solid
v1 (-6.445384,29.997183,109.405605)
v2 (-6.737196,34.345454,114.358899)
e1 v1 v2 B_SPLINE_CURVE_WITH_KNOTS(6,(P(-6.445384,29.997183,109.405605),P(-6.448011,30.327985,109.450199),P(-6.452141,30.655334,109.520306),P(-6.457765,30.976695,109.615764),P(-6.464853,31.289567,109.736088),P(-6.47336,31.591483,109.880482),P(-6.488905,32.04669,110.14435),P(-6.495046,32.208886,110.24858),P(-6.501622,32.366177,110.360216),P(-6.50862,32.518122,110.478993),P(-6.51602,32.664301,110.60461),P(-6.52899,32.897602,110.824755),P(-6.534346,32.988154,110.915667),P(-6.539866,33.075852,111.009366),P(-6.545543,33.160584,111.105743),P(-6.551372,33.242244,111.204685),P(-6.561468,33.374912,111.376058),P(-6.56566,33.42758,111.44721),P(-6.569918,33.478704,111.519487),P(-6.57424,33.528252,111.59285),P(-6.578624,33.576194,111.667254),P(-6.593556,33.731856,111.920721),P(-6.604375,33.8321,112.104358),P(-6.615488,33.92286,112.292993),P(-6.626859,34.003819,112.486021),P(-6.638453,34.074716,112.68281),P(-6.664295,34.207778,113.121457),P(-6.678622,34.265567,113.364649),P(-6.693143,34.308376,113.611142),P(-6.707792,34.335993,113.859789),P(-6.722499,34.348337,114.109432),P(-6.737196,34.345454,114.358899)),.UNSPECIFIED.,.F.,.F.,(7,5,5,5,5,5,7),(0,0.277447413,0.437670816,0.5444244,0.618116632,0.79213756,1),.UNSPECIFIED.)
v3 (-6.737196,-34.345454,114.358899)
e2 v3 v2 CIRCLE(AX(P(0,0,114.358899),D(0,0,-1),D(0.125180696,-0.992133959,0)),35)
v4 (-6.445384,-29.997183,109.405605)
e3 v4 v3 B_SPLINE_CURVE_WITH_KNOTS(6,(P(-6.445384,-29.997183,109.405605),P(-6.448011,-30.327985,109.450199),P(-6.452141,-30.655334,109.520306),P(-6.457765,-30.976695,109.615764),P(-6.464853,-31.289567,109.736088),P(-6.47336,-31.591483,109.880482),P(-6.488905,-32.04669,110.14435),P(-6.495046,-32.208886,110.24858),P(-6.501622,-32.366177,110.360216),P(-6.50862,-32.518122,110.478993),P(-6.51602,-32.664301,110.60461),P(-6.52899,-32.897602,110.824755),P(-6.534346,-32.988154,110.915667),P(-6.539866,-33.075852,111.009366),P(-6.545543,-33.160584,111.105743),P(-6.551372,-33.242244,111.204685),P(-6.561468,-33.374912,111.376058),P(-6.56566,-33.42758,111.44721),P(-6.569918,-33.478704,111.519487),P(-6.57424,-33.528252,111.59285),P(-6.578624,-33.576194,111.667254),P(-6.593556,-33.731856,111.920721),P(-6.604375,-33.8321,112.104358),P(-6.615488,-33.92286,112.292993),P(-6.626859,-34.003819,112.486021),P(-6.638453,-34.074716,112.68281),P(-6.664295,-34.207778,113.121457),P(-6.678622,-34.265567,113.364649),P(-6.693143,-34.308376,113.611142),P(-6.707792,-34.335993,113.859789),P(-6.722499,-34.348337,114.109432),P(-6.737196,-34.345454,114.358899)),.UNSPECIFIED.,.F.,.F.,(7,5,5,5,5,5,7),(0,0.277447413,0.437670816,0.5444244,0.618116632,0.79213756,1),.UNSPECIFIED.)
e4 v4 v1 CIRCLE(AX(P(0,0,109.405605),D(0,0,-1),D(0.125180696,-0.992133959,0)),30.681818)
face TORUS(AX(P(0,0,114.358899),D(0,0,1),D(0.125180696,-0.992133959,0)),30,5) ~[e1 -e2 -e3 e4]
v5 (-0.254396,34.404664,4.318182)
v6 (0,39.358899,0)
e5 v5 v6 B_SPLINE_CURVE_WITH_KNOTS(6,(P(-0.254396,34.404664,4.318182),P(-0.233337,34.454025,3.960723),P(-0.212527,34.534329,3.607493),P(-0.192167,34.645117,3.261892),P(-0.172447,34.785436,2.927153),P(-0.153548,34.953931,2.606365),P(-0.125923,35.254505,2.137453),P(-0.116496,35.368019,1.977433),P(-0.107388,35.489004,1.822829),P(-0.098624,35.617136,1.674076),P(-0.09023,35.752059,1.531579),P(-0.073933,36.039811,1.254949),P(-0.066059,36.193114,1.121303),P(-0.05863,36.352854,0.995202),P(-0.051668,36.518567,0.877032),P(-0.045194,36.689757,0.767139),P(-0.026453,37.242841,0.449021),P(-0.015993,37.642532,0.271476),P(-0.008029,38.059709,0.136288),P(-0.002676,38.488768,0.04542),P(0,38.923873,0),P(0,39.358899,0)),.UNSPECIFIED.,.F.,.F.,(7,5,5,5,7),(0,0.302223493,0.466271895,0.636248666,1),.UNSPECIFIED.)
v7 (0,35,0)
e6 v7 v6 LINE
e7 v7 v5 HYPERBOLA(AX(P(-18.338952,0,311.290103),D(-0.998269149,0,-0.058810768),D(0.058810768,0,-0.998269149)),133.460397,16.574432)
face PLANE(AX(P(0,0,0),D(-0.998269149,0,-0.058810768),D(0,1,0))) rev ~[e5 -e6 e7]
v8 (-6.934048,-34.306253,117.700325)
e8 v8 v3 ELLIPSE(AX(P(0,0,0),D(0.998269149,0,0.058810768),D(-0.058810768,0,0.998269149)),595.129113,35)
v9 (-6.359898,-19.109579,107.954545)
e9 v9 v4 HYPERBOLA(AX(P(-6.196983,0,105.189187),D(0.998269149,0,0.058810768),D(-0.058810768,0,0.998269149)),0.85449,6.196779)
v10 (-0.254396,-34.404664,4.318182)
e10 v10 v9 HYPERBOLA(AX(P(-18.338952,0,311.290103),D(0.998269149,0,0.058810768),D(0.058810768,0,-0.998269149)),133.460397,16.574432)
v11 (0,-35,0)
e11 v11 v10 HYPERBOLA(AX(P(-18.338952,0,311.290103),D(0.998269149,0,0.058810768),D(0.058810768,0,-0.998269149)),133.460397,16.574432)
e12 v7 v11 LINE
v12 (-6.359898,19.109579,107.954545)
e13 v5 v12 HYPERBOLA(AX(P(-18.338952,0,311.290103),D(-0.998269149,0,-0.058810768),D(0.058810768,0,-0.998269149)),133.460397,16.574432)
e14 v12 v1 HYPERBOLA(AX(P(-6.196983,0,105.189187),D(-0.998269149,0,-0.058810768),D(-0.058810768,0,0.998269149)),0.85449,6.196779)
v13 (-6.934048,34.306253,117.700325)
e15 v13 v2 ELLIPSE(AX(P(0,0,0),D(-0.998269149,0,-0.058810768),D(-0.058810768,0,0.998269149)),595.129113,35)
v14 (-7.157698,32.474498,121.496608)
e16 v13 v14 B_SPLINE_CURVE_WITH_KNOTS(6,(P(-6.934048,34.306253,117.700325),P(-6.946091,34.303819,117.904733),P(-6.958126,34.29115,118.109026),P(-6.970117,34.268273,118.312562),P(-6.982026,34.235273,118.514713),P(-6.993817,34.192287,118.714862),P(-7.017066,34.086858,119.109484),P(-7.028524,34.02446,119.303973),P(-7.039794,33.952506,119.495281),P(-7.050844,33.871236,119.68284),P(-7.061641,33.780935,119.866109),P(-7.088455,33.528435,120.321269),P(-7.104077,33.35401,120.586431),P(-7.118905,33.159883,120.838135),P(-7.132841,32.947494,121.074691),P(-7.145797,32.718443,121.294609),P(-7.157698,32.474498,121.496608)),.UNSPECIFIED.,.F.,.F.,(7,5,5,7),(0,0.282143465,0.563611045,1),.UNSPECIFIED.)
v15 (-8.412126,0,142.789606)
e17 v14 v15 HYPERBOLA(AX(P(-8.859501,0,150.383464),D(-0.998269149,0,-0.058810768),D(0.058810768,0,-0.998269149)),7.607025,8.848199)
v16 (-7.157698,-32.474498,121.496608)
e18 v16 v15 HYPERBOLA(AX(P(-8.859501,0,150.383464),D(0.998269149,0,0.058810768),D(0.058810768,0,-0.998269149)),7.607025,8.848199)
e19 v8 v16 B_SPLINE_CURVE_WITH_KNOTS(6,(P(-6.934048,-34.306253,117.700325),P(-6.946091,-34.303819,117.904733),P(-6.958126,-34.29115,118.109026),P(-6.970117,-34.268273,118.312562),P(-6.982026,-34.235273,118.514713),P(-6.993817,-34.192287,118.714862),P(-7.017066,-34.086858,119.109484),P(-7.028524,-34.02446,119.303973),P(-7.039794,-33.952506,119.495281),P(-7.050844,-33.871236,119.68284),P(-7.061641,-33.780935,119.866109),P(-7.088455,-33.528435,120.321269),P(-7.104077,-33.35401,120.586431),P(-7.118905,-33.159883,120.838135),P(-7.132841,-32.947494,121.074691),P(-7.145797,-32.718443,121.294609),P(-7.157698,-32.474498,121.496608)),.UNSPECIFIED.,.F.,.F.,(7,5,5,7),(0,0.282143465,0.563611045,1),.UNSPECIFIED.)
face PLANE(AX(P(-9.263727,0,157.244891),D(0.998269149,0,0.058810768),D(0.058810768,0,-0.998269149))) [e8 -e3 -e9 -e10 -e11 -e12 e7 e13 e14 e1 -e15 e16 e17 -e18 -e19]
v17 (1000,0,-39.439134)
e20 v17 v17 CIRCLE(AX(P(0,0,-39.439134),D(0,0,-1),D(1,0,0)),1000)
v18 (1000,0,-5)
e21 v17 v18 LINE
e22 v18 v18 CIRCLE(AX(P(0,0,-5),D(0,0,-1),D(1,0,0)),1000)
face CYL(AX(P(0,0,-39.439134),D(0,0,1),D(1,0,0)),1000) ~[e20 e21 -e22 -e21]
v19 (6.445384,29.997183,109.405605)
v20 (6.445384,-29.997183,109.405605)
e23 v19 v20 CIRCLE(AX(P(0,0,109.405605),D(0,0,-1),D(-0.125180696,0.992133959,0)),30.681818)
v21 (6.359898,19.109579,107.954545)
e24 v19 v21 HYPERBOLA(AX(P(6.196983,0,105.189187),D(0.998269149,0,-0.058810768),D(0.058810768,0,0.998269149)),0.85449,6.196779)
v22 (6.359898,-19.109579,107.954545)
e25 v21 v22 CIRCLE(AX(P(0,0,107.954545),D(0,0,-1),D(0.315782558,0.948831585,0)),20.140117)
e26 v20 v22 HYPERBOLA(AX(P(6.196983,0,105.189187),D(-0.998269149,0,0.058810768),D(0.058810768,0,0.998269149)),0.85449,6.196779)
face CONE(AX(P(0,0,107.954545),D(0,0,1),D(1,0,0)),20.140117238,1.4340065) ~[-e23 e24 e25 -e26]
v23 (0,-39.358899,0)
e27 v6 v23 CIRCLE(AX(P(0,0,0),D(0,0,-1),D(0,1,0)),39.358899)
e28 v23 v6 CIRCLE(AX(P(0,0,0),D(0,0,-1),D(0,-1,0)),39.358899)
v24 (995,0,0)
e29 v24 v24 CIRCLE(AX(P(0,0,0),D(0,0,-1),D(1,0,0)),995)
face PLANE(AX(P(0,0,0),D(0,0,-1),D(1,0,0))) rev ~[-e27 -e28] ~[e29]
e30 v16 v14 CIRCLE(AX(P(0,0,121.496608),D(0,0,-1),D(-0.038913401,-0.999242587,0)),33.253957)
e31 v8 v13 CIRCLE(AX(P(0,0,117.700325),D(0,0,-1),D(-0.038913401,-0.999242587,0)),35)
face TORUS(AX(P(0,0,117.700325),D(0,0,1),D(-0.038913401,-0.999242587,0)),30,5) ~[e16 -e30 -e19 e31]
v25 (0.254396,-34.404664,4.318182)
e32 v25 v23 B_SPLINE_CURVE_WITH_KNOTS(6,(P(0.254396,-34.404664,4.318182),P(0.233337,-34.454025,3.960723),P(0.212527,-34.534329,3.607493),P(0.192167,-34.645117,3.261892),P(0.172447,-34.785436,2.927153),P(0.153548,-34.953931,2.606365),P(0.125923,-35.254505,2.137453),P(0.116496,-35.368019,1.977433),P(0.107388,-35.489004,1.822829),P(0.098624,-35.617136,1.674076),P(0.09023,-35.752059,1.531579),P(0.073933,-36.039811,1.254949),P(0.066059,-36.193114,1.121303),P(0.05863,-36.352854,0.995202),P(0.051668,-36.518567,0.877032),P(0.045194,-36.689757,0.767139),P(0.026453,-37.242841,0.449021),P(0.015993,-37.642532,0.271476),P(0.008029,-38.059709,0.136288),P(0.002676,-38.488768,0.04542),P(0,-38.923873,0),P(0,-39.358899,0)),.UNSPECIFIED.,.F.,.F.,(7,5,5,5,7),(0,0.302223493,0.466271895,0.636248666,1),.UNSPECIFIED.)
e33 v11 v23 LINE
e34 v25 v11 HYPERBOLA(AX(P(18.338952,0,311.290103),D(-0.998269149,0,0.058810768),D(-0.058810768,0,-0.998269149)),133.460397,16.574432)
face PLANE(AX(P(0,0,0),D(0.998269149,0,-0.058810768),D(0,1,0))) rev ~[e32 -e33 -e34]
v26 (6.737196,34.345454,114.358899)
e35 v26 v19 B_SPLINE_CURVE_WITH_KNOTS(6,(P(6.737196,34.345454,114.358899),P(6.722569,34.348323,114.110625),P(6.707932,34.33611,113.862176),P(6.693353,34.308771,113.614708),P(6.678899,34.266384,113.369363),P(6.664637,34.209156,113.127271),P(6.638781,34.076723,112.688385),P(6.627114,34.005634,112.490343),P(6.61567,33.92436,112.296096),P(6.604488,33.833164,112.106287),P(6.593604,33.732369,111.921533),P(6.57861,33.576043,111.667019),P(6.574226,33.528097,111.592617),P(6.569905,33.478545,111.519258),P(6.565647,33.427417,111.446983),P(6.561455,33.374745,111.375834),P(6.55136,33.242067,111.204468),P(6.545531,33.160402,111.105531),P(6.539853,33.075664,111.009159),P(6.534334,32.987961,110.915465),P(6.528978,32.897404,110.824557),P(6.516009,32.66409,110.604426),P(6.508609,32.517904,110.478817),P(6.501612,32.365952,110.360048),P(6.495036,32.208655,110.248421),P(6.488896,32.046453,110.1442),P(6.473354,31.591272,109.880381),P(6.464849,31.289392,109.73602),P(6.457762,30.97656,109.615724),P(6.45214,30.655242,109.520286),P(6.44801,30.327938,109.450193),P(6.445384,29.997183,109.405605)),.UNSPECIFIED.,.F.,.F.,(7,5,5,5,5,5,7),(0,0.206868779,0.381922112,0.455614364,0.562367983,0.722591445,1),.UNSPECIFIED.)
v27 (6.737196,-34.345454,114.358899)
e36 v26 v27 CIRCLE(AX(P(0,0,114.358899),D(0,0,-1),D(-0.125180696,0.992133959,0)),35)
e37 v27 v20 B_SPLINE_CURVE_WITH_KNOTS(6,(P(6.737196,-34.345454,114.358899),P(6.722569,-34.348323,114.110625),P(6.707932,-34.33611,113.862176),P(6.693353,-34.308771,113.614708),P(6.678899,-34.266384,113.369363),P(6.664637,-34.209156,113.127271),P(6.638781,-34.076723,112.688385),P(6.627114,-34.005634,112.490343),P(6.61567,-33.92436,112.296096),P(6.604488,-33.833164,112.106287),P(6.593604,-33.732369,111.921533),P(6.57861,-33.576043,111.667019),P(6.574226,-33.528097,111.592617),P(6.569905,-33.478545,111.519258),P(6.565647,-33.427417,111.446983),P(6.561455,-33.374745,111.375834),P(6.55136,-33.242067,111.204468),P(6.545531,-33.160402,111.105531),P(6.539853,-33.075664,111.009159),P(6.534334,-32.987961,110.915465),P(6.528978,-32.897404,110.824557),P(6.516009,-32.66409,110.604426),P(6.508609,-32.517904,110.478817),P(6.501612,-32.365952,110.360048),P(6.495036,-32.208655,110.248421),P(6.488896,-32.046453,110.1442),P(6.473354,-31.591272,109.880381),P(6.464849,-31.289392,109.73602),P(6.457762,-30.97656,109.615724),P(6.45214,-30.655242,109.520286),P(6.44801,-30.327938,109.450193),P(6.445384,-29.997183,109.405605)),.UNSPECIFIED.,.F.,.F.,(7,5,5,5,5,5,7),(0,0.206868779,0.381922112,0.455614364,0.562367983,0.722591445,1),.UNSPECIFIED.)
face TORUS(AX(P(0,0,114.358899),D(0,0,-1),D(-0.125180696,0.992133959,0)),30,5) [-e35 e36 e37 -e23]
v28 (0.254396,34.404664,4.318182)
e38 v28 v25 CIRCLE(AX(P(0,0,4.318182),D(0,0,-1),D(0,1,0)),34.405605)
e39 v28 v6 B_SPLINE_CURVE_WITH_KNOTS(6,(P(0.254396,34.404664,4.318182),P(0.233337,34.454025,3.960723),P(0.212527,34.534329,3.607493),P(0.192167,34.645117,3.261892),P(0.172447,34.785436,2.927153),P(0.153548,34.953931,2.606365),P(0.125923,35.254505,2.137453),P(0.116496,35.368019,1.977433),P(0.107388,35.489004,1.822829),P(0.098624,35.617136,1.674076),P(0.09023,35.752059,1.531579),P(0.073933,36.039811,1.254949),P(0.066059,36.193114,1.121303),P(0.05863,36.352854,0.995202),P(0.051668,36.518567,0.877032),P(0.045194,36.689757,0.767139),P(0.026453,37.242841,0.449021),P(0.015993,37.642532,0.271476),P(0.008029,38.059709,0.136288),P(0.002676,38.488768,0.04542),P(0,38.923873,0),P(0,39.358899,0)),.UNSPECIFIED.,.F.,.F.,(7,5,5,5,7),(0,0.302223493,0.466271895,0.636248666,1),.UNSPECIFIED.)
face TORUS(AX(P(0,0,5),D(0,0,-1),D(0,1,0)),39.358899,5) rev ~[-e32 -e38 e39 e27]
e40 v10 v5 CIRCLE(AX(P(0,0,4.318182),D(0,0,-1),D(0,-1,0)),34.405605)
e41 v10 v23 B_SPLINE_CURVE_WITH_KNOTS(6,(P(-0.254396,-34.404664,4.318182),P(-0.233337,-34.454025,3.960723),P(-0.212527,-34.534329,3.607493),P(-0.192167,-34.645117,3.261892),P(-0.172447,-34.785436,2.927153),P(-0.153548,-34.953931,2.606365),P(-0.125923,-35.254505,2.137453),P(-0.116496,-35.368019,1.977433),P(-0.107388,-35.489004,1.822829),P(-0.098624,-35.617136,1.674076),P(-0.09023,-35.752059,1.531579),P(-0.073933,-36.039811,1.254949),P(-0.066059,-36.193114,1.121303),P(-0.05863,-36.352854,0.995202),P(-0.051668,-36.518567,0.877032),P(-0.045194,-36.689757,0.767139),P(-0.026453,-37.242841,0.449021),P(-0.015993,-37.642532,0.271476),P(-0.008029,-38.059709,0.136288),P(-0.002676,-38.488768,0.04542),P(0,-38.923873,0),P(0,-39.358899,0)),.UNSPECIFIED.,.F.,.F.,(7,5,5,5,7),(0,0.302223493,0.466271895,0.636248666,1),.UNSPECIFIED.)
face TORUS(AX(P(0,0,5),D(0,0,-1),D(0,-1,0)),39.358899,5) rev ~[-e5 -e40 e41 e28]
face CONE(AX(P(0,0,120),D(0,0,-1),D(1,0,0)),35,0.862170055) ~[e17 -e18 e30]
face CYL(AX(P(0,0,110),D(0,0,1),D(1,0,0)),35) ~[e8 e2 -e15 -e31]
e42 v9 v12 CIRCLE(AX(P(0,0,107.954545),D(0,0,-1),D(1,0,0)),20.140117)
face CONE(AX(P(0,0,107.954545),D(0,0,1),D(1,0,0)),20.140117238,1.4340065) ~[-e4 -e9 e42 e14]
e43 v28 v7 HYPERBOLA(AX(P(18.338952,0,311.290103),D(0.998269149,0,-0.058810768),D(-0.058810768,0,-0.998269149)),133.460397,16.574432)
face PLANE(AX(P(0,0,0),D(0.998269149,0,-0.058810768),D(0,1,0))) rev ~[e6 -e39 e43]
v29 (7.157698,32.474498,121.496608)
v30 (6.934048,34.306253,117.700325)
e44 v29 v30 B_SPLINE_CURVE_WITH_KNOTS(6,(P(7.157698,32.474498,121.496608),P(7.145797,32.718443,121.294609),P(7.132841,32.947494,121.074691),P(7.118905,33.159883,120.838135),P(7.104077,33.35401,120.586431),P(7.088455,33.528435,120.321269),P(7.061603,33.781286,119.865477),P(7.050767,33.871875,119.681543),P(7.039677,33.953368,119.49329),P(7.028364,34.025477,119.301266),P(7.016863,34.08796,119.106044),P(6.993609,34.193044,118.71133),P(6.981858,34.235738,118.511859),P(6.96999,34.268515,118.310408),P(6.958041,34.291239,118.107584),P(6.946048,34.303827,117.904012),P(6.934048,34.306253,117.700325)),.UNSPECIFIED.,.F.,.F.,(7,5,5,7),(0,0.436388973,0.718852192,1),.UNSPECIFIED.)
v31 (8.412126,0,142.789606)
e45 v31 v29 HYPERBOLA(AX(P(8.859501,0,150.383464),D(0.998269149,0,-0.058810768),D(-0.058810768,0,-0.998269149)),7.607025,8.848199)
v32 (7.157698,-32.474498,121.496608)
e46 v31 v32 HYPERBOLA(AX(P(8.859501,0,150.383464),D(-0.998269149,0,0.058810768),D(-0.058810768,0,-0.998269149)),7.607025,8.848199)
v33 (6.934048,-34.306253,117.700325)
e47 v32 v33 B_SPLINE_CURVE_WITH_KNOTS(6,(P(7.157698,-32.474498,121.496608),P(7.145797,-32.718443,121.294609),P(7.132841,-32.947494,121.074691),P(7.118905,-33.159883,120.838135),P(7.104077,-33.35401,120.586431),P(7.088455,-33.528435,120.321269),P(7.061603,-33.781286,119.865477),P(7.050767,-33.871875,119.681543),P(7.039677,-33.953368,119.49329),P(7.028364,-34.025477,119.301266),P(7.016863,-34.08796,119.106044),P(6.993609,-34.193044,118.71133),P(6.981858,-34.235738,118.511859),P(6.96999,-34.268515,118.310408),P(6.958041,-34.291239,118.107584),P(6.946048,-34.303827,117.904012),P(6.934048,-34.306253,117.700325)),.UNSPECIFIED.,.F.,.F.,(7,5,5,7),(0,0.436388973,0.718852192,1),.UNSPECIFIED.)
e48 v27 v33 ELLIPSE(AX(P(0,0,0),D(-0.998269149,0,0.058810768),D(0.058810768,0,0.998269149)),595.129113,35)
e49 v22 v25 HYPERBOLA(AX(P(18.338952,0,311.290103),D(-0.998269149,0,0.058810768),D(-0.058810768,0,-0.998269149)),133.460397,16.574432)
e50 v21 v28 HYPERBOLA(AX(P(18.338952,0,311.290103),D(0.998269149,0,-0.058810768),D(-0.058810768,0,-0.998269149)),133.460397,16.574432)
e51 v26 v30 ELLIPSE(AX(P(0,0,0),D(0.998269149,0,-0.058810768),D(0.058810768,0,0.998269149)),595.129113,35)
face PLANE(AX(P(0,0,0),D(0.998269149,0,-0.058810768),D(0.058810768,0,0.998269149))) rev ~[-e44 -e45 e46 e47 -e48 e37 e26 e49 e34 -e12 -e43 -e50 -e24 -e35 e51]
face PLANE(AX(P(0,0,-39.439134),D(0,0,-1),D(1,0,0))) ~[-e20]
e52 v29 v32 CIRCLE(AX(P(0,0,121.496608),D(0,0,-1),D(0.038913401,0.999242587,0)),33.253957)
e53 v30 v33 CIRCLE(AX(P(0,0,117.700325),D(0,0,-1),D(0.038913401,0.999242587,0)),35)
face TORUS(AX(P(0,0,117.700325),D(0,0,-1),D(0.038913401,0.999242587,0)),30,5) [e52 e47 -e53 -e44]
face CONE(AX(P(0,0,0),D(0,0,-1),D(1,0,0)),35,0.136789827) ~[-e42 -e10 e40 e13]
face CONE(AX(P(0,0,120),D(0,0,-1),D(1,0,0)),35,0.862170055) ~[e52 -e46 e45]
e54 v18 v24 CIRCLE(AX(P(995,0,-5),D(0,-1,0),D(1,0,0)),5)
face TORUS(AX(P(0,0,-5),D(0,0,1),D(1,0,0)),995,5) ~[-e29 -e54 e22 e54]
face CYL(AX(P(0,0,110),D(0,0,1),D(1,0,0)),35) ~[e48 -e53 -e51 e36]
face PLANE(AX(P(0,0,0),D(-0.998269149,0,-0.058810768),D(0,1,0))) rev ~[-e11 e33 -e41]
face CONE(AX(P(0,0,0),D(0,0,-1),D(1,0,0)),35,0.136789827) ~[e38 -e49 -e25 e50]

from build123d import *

# Parameters (mm, degrees)
F3_DEPTH      = 1000.001
F3_DEPTH_BACK = 1000.001
F4_T4_ANGLE   = 180
F4_T9_ANGLE   = 180
F4_T12_ANGLE  = 175.5397265939
F4_T14_ANGLE  = 175.5397265939
F4_T16_ANGLE  = 194.3823817652
F4_T18_ANGLE  = 194.3823817652


# Not quite as in the source:
# - a fillet or chamfer that OpenCascade refuses, or shapes differently, is made with other operations: its cross-section is extruded or revolved along the edge and cut away or added


with BuildPart() as f1:
    # F0 (on Front) → F1 (revolve)
    with BuildSketch(Plane.XZ):
        Polygon((0, 150), (0, 0), (35, 0), (20.1401172379, 107.9545454545), (35, 110), (35, 120), align=None)
        Polygon((35, 0), (0, 0), (0, -39.4391342998), (1000, -39.4391342998), (1000, 0), align=None)
    revolve(axis=Axis((0, 0, 75), (0, 0, -1)))

    # F2 (on Front) → F3 (cut, two sides)
    with BuildSketch(Plane.XZ) as f3_sk:
        Polygon((-9.2637268826, 157.2448909283), (0, 0), (9.2637268826, 157.2448909283), (0, 157.7906424325), align=None)
    extrude(amount=F3_DEPTH, mode=Mode.SUBTRACT)
    extrude(f3_sk.sketch, amount=-F3_DEPTH_BACK, mode=Mode.SUBTRACT)

    # F4: fillet of radius 5 on 7 edges, made by hand


with BuildPart() as f4_tool2:
    # F4_s3 → F4_t4 (revolve)
    with BuildSketch(Plane.YZ):
        with BuildLine():
            ThreePointArc((39.3588989435, 0), (36.0732552402, 1.2311081928), (34.4056046895, 4.3181818182))
            Line((34.4056046895, 4.3181818182), (35, 0))
            Line((35, 0), (39.3588989435, 0))
        make_face()
    revolve(axis=Axis((0, 0, 0), (0, 0, -1)), revolution_arc=F4_T4_ANGLE)

    split(bisect_by=Plane(origin=(0, 0, 0), x_dir=(0, 1, 0), z_dir=(0.9982691489, 0, -0.0588107677)), keep=Keep.TOP)


with BuildPart() as f1_1:
    add(f1.part)

    # F4_t1: union F4_tool2
    add(f4_tool2.part)


with BuildPart() as f4_tool7:
    # F4_s8 → F4_t9 (revolve)
    with BuildSketch(Plane.YZ):
        with BuildLine():
            ThreePointArc((-39.3588989435, 0), (-36.0732552402, 1.2311081928), (-34.4056046895, 4.3181818182))
            Line((-34.4056046895, 4.3181818182), (-35, 0))
            Line((-35, 0), (-39.3588989435, 0))
        make_face()
    revolve(axis=Axis((0, 0, 0), (0, 0, -1)), revolution_arc=F4_T9_ANGLE)

    split(bisect_by=Plane(origin=(0, 0, 0), x_dir=(0, 1, 0), z_dir=(-0.9982691489, 0, -0.0588107677)), keep=Keep.TOP)


with BuildPart() as f1_2:
    add(f1_1.part)

    # F4_t6: union F4_tool7
    add(f4_tool7.part)

    # F4_s11 → F4_t12 (revolve, cut)
    with BuildSketch(Plane(origin=(0, 0, 0), x_dir=(0, 0, 1), z_dir=(-0.9992425868, 0.0389134008, 0))):
        with BuildLine():
            ThreePointArc((121.4966083995, 33.2539568673), (119.7896094353, 34.5425644925), (117.7003253876, 35))
            Line((117.7003253876, 35), (120, 35))
            Line((120, 35), (121.4966083995, 33.2539568673))
        make_face()
    revolve(axis=Axis((0, 0, 120), (0, 0, -1)), revolution_arc=F4_T12_ANGLE, mode=Mode.SUBTRACT)

    # F4_s13 → F4_t14 (revolve, cut)
    with BuildSketch(Plane(origin=(0, 0, 0), x_dir=(0, 0, 1), z_dir=(0.9992425868, -0.0389134008, 0))):
        with BuildLine():
            ThreePointArc((117.7003253876, 35), (119.7896094353, 34.5425644925), (121.4966083995, 33.2539568673))
            Line((121.4966083995, 33.2539568673), (120, 35))
            Line((120, 35), (117.7003253876, 35))
        make_face()
    revolve(axis=Axis((0, 0, 120), (0, 0, -1)), revolution_arc=F4_T14_ANGLE, mode=Mode.SUBTRACT)

    # F4_s15 → F4_t16 (revolve, cut)
    with BuildSketch(Plane(origin=(0, 0, 0), x_dir=(0, 0, 1), z_dir=(0.9921339593, 0.1251806963, 0))):
        with BuildLine():
            ThreePointArc((109.4056046895, 30.6818181818), (111.0732552402, 33.7688918072), (114.3588989435, 35))
            Line((114.3588989435, 35), (110, 35))
            Line((110, 35), (109.4056046895, 30.6818181818))
        make_face()
    revolve(axis=Axis((0, 0, 110), (0, 0, -1)), revolution_arc=F4_T16_ANGLE, mode=Mode.SUBTRACT)

    # F4_s17 → F4_t18 (revolve, cut)
    with BuildSketch(Plane(origin=(0, 0, 0), x_dir=(0, 0, 1), z_dir=(-0.9921339593, -0.1251806963, 0))):
        with BuildLine():
            ThreePointArc((114.3588989435, 35), (111.0732552402, 33.7688918072), (109.4056046895, 30.6818181818))
            Line((109.4056046895, 30.6818181818), (110, 35))
            Line((110, 35), (114.3588989435, 35))
        make_face()
    revolve(axis=Axis((0, 0, 110), (0, 0, -1)), revolution_arc=F4_T18_ANGLE, mode=Mode.SUBTRACT)

    # F4_s19 → F4_t20 (revolve, cut)
    with BuildSketch(Plane.XZ):
        with BuildLine():
            ThreePointArc((1000, -5), (998.5355339059, -1.4644660941), (995, 0))
            Line((995, 0), (1000, 0))
            Line((1000, 0), (1000, -5))
        make_face()
    revolve(axis=Axis((0, 0, 0), (0, 0, -1)), mode=Mode.SUBTRACT)


solid = f1_2.part
